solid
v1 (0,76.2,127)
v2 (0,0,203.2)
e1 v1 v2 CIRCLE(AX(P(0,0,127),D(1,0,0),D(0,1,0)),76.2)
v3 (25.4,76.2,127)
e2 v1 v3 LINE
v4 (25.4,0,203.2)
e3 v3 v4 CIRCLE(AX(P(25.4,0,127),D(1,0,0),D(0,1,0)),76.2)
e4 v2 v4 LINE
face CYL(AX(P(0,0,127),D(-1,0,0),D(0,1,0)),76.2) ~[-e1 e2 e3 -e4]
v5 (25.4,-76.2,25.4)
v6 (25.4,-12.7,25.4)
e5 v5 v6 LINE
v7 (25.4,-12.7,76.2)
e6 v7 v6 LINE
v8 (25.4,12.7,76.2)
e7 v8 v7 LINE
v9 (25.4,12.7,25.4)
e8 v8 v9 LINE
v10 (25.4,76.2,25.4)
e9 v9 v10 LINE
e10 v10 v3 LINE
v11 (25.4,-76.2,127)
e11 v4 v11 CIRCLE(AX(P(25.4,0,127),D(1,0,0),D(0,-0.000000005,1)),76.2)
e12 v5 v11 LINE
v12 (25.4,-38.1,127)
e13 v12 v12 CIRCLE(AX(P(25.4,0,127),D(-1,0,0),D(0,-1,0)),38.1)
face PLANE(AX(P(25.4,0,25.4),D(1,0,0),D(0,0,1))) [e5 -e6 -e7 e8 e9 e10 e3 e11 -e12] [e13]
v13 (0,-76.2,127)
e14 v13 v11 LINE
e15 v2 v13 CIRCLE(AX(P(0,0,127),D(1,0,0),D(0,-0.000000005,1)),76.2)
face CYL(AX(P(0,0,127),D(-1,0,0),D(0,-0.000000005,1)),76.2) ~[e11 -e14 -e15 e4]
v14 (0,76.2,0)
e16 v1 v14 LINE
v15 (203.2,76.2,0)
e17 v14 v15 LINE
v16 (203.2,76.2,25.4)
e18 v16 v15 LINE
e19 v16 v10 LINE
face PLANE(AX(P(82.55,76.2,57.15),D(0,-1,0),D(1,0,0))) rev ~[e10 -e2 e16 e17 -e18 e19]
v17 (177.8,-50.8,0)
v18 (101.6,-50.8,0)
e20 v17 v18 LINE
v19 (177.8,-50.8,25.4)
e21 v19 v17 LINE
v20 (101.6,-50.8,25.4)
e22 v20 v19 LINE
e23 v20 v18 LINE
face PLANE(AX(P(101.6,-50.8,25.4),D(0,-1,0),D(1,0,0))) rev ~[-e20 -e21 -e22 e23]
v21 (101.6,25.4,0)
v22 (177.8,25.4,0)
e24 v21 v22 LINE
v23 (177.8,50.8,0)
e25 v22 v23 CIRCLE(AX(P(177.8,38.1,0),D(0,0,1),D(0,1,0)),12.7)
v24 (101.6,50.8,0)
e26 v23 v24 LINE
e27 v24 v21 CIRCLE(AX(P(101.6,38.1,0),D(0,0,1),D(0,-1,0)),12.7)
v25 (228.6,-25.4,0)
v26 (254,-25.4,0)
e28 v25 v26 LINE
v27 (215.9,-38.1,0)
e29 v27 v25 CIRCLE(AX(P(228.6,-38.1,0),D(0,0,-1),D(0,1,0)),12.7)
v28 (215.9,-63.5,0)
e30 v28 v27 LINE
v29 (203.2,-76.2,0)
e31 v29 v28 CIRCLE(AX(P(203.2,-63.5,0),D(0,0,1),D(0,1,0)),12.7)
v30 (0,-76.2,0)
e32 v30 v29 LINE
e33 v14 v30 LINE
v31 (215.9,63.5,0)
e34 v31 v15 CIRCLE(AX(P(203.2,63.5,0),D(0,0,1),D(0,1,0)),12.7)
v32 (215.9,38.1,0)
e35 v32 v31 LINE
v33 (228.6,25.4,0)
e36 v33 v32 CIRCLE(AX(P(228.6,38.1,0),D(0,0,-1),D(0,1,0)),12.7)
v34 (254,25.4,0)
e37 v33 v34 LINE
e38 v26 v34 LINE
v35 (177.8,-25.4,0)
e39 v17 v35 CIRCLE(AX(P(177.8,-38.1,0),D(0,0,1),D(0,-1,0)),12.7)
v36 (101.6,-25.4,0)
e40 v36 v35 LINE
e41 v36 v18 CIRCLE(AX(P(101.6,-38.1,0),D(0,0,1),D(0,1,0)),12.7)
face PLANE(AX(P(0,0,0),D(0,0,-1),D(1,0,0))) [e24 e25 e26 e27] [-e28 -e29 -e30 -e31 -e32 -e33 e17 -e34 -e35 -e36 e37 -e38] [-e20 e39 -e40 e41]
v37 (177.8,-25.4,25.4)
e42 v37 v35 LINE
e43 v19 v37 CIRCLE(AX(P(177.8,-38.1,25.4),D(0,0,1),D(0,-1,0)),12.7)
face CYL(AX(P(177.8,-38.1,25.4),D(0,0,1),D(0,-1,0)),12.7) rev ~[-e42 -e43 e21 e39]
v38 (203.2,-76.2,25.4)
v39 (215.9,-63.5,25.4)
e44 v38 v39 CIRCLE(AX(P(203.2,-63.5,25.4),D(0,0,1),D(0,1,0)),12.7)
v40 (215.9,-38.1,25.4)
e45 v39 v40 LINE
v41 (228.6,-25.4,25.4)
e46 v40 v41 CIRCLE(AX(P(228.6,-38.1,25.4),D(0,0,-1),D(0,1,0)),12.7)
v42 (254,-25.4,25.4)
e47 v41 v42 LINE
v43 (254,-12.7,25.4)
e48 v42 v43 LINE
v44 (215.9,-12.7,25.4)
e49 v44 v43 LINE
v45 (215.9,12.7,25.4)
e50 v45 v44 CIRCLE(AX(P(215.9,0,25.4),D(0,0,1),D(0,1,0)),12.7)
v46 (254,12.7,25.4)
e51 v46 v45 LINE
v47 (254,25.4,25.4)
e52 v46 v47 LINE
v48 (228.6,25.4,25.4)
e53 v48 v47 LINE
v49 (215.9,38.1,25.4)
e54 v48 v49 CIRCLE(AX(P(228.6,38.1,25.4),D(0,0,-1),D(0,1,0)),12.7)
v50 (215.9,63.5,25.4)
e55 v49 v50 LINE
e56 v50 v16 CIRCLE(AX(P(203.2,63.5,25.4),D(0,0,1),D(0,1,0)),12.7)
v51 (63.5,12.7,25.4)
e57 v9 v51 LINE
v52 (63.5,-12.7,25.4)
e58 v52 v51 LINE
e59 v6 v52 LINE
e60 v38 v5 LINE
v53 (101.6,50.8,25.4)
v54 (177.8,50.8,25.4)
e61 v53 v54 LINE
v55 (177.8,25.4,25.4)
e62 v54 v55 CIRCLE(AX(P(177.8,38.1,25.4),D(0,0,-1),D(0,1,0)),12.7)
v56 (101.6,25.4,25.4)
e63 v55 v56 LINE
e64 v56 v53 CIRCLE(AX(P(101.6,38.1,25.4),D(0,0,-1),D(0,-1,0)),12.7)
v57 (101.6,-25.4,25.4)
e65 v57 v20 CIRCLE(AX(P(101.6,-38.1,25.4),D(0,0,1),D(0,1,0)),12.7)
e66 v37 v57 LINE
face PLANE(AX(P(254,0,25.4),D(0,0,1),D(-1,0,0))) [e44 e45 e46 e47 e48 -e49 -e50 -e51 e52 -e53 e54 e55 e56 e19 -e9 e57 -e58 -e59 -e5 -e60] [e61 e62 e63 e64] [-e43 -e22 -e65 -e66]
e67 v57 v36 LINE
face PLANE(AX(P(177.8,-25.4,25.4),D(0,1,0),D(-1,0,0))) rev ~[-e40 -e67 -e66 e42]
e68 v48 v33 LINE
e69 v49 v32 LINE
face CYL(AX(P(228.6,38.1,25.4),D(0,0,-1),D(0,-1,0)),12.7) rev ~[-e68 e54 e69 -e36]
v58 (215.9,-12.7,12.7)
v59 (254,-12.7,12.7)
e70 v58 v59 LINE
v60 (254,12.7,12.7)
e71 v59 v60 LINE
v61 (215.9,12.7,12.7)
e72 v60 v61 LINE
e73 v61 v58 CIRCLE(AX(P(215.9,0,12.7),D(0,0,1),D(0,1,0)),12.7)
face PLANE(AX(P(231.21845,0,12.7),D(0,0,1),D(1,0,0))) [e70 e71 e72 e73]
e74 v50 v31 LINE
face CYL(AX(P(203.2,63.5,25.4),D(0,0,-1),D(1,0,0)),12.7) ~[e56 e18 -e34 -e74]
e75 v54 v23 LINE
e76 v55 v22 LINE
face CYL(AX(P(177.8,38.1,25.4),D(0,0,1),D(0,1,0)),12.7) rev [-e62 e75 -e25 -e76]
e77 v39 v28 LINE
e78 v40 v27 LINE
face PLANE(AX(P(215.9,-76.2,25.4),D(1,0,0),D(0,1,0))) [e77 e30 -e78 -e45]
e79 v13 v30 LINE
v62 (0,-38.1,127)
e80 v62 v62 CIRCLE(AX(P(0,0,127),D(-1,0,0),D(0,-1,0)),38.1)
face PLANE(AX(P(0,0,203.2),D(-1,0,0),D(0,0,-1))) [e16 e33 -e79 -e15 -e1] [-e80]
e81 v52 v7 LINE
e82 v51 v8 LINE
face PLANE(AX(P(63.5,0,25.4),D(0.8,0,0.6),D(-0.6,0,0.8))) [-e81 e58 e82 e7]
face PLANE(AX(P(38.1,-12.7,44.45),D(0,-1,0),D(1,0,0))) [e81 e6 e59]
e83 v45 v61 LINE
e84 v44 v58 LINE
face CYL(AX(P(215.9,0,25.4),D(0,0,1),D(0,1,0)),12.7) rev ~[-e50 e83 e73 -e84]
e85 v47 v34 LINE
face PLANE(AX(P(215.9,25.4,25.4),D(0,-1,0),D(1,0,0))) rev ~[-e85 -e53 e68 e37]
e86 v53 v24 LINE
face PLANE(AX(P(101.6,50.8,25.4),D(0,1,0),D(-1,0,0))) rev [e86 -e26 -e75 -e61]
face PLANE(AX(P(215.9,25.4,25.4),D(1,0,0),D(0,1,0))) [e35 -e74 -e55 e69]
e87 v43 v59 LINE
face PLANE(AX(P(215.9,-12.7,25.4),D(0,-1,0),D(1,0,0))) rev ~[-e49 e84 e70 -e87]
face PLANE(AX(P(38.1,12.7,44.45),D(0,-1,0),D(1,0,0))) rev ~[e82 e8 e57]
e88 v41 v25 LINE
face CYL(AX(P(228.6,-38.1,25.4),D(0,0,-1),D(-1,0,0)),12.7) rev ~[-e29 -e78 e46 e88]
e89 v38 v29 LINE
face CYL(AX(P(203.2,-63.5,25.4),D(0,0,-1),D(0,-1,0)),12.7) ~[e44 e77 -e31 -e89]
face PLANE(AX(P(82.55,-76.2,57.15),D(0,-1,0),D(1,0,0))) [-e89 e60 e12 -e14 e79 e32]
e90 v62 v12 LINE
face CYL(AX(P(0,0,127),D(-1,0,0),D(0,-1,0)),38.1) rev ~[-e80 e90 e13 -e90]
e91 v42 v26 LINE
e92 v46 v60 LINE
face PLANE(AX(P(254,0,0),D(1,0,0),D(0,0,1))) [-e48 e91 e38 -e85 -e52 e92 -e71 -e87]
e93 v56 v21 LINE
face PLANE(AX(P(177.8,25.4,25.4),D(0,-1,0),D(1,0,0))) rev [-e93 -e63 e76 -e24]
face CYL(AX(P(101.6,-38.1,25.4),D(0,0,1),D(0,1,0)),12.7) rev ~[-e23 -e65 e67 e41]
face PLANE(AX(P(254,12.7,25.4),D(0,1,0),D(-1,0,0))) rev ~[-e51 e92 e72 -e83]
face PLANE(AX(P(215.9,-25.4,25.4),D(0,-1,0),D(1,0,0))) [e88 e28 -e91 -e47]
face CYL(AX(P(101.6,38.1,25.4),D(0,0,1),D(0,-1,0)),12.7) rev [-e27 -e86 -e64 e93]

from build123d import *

# Parameters (mm, degrees)
F1_DEPTH  = 76.2
F3_DEPTH  = 12.7
F2_W      = 38.1
F2_H      = 50.8
F4_DEPTH  = 25.4
F5_DEPTH  = 25.4
F6_R      = 12.7
F7_R      = 38.1
F8_DEPTH  = 25.4
F9_DEPTH  = 25.401
F10_DEPTH = 12.7


# Not quite as in the source:
# - a pattern or mirror of a feature is missing from the dataset's text; its kind, count and spacing are read off the source's solid
# - a feature names something its author has since deleted; it is built from what else it names


with BuildPart() as f1:
    # F0 (on Front) → F1 (new body, symmetric)
    with BuildSketch(Plane.XZ):
        Polygon((25.4, 203.2), (0, 203.2), (0, 0), (254, 0), (254, 12.7), (254, 25.4), (63.5, 25.4), (25.4, 25.4), (25.4, 76.2), align=None)
    extrude(amount=F1_DEPTH, both=True)

    # F2 (on face) → F3 (cut)
    with BuildSketch(Plane.XY.offset(25.4)):
        with BuildLine():
            Line((215.9, -12.7), (254, -12.7))
            Line((254, -12.7), (254, 12.7))
            Line((254, 12.7), (215.9, 12.7))
            ThreePointArc((215.9, 12.7), (203.2, 0), (215.9, -12.7))
        make_face()
    extrude(amount=-F3_DEPTH, mode=Mode.SUBTRACT)

    # F2 (on face) → F4 (join)
    with BuildSketch(Plane.XY.offset(25.4)):
        with BuildLine():
            Line((25.4, -76.2), (215.9, -76.2))
            Line((215.9, -76.2), (215.9, -25.4))
            Line((215.9, -25.4), (254, -25.4))
            Line((254, -25.4), (254, -12.7))
            Line((254, -12.7), (215.9, -12.7))
            ThreePointArc((215.9, -12.7), (203.2, 0), (215.9, 12.7))
            Line((215.9, 12.7), (254, 12.7))
            Line((254, 12.7), (254, 25.4))
            Line((254, 25.4), (215.9, 25.4))
            Line((215.9, 25.4), (215.9, 76.2))
            Line((215.9, 76.2), (25.4, 76.2))
            Line((25.4, 76.2), (25.4, -76.2))
        make_face()
        with BuildLine():
            ThreePointArc((177.8, -25.4), (190.5, -38.1), (177.8, -50.8))
            Line((177.8, -50.8), (101.6, -50.8))
            ThreePointArc((101.6, -50.8), (88.9, -38.1), (101.6, -25.4))
            Line((101.6, -25.4), (177.8, -25.4))
        make_face(mode=Mode.SUBTRACT)
        with Locations((234.95, -50.8)):
            Rectangle(F2_W, F2_H)
        with BuildLine():
            Line((101.6, -50.8), (177.8, -50.8))
            ThreePointArc((177.8, -50.8), (190.5, -38.1), (177.8, -25.4))
            Line((177.8, -25.4), (101.6, -25.4))
            ThreePointArc((101.6, -25.4), (88.9, -38.1), (101.6, -50.8))
        make_face()
    extrude(amount=-F4_DEPTH)

    # F2 (on face) → F5 (cut)
    with BuildSketch(Plane.XY.offset(25.4)):
        with Locations((234.95, -50.8)):
            Rectangle(F2_W, F2_H)
        with Locations((234.95, 50.8)):
            Rectangle(F2_W, F2_H)
    extrude(amount=-F5_DEPTH, mode=Mode.SUBTRACT)

    # F6
    f6_edges = [f1.edges().sort_by_distance(p)[0] for p in [
        (215.9, -25.4, 12.7),
        (215.9, -76.2, 12.7),
        (215.9, 25.4, 12.7),
        (215.9, 76.2, 12.7),
    ]]
    fillet(f6_edges, radius=F6_R)

    # F7 (on face) → F8 (cut)
    with BuildSketch(Plane(origin=(0, 0, 0), x_dir=(0, -1, 0), z_dir=(-1, 0, 0))):
        with BuildLine():
            ThreePointArc((3.576e-07, 203.2), (53.8815368528, 180.8815366), (76.2, 127))
            Line((76.2, 127), (76.2, 203.2))
            Line((76.2, 203.2), (3.576e-07, 203.2))
        make_face()
        with Locations((0, 127)):
            Circle(F7_R)
        with BuildLine():
            ThreePointArc((-76.2, 127), (-53.8815366, 180.8815368528), (3.576e-07, 203.2))
            Line((3.576e-07, 203.2), (-76.2, 203.2))
            Line((-76.2, 203.2), (-76.2, 127))
        make_face()
    extrude(amount=-F8_DEPTH, mode=Mode.SUBTRACT)

    # F2 (on face) → F9 (cut, through all)
    with BuildSketch(Plane.XY.offset(25.4)):
        with BuildLine():
            Line((101.6, -50.8), (177.8, -50.8))
            ThreePointArc((177.8, -50.8), (190.5, -38.1), (177.8, -25.4))
            Line((177.8, -25.4), (101.6, -25.4))
            ThreePointArc((101.6, -25.4), (88.9, -38.1), (101.6, -50.8))
        make_face()
    f9 = extrude(amount=-F9_DEPTH, mode=Mode.SUBTRACT)

    # F9_copies: F9 across plane
    add(f9.mirror(Plane.ZX), mode=Mode.SUBTRACT)

    # F0 (on Front) → F10 (join, symmetric)
    with BuildSketch(Plane.XZ):
        Polygon((63.5, 25.4), (25.4, 76.2), (25.4, 25.4), align=None)
    extrude(amount=F10_DEPTH, both=True)


solid = f1.part
